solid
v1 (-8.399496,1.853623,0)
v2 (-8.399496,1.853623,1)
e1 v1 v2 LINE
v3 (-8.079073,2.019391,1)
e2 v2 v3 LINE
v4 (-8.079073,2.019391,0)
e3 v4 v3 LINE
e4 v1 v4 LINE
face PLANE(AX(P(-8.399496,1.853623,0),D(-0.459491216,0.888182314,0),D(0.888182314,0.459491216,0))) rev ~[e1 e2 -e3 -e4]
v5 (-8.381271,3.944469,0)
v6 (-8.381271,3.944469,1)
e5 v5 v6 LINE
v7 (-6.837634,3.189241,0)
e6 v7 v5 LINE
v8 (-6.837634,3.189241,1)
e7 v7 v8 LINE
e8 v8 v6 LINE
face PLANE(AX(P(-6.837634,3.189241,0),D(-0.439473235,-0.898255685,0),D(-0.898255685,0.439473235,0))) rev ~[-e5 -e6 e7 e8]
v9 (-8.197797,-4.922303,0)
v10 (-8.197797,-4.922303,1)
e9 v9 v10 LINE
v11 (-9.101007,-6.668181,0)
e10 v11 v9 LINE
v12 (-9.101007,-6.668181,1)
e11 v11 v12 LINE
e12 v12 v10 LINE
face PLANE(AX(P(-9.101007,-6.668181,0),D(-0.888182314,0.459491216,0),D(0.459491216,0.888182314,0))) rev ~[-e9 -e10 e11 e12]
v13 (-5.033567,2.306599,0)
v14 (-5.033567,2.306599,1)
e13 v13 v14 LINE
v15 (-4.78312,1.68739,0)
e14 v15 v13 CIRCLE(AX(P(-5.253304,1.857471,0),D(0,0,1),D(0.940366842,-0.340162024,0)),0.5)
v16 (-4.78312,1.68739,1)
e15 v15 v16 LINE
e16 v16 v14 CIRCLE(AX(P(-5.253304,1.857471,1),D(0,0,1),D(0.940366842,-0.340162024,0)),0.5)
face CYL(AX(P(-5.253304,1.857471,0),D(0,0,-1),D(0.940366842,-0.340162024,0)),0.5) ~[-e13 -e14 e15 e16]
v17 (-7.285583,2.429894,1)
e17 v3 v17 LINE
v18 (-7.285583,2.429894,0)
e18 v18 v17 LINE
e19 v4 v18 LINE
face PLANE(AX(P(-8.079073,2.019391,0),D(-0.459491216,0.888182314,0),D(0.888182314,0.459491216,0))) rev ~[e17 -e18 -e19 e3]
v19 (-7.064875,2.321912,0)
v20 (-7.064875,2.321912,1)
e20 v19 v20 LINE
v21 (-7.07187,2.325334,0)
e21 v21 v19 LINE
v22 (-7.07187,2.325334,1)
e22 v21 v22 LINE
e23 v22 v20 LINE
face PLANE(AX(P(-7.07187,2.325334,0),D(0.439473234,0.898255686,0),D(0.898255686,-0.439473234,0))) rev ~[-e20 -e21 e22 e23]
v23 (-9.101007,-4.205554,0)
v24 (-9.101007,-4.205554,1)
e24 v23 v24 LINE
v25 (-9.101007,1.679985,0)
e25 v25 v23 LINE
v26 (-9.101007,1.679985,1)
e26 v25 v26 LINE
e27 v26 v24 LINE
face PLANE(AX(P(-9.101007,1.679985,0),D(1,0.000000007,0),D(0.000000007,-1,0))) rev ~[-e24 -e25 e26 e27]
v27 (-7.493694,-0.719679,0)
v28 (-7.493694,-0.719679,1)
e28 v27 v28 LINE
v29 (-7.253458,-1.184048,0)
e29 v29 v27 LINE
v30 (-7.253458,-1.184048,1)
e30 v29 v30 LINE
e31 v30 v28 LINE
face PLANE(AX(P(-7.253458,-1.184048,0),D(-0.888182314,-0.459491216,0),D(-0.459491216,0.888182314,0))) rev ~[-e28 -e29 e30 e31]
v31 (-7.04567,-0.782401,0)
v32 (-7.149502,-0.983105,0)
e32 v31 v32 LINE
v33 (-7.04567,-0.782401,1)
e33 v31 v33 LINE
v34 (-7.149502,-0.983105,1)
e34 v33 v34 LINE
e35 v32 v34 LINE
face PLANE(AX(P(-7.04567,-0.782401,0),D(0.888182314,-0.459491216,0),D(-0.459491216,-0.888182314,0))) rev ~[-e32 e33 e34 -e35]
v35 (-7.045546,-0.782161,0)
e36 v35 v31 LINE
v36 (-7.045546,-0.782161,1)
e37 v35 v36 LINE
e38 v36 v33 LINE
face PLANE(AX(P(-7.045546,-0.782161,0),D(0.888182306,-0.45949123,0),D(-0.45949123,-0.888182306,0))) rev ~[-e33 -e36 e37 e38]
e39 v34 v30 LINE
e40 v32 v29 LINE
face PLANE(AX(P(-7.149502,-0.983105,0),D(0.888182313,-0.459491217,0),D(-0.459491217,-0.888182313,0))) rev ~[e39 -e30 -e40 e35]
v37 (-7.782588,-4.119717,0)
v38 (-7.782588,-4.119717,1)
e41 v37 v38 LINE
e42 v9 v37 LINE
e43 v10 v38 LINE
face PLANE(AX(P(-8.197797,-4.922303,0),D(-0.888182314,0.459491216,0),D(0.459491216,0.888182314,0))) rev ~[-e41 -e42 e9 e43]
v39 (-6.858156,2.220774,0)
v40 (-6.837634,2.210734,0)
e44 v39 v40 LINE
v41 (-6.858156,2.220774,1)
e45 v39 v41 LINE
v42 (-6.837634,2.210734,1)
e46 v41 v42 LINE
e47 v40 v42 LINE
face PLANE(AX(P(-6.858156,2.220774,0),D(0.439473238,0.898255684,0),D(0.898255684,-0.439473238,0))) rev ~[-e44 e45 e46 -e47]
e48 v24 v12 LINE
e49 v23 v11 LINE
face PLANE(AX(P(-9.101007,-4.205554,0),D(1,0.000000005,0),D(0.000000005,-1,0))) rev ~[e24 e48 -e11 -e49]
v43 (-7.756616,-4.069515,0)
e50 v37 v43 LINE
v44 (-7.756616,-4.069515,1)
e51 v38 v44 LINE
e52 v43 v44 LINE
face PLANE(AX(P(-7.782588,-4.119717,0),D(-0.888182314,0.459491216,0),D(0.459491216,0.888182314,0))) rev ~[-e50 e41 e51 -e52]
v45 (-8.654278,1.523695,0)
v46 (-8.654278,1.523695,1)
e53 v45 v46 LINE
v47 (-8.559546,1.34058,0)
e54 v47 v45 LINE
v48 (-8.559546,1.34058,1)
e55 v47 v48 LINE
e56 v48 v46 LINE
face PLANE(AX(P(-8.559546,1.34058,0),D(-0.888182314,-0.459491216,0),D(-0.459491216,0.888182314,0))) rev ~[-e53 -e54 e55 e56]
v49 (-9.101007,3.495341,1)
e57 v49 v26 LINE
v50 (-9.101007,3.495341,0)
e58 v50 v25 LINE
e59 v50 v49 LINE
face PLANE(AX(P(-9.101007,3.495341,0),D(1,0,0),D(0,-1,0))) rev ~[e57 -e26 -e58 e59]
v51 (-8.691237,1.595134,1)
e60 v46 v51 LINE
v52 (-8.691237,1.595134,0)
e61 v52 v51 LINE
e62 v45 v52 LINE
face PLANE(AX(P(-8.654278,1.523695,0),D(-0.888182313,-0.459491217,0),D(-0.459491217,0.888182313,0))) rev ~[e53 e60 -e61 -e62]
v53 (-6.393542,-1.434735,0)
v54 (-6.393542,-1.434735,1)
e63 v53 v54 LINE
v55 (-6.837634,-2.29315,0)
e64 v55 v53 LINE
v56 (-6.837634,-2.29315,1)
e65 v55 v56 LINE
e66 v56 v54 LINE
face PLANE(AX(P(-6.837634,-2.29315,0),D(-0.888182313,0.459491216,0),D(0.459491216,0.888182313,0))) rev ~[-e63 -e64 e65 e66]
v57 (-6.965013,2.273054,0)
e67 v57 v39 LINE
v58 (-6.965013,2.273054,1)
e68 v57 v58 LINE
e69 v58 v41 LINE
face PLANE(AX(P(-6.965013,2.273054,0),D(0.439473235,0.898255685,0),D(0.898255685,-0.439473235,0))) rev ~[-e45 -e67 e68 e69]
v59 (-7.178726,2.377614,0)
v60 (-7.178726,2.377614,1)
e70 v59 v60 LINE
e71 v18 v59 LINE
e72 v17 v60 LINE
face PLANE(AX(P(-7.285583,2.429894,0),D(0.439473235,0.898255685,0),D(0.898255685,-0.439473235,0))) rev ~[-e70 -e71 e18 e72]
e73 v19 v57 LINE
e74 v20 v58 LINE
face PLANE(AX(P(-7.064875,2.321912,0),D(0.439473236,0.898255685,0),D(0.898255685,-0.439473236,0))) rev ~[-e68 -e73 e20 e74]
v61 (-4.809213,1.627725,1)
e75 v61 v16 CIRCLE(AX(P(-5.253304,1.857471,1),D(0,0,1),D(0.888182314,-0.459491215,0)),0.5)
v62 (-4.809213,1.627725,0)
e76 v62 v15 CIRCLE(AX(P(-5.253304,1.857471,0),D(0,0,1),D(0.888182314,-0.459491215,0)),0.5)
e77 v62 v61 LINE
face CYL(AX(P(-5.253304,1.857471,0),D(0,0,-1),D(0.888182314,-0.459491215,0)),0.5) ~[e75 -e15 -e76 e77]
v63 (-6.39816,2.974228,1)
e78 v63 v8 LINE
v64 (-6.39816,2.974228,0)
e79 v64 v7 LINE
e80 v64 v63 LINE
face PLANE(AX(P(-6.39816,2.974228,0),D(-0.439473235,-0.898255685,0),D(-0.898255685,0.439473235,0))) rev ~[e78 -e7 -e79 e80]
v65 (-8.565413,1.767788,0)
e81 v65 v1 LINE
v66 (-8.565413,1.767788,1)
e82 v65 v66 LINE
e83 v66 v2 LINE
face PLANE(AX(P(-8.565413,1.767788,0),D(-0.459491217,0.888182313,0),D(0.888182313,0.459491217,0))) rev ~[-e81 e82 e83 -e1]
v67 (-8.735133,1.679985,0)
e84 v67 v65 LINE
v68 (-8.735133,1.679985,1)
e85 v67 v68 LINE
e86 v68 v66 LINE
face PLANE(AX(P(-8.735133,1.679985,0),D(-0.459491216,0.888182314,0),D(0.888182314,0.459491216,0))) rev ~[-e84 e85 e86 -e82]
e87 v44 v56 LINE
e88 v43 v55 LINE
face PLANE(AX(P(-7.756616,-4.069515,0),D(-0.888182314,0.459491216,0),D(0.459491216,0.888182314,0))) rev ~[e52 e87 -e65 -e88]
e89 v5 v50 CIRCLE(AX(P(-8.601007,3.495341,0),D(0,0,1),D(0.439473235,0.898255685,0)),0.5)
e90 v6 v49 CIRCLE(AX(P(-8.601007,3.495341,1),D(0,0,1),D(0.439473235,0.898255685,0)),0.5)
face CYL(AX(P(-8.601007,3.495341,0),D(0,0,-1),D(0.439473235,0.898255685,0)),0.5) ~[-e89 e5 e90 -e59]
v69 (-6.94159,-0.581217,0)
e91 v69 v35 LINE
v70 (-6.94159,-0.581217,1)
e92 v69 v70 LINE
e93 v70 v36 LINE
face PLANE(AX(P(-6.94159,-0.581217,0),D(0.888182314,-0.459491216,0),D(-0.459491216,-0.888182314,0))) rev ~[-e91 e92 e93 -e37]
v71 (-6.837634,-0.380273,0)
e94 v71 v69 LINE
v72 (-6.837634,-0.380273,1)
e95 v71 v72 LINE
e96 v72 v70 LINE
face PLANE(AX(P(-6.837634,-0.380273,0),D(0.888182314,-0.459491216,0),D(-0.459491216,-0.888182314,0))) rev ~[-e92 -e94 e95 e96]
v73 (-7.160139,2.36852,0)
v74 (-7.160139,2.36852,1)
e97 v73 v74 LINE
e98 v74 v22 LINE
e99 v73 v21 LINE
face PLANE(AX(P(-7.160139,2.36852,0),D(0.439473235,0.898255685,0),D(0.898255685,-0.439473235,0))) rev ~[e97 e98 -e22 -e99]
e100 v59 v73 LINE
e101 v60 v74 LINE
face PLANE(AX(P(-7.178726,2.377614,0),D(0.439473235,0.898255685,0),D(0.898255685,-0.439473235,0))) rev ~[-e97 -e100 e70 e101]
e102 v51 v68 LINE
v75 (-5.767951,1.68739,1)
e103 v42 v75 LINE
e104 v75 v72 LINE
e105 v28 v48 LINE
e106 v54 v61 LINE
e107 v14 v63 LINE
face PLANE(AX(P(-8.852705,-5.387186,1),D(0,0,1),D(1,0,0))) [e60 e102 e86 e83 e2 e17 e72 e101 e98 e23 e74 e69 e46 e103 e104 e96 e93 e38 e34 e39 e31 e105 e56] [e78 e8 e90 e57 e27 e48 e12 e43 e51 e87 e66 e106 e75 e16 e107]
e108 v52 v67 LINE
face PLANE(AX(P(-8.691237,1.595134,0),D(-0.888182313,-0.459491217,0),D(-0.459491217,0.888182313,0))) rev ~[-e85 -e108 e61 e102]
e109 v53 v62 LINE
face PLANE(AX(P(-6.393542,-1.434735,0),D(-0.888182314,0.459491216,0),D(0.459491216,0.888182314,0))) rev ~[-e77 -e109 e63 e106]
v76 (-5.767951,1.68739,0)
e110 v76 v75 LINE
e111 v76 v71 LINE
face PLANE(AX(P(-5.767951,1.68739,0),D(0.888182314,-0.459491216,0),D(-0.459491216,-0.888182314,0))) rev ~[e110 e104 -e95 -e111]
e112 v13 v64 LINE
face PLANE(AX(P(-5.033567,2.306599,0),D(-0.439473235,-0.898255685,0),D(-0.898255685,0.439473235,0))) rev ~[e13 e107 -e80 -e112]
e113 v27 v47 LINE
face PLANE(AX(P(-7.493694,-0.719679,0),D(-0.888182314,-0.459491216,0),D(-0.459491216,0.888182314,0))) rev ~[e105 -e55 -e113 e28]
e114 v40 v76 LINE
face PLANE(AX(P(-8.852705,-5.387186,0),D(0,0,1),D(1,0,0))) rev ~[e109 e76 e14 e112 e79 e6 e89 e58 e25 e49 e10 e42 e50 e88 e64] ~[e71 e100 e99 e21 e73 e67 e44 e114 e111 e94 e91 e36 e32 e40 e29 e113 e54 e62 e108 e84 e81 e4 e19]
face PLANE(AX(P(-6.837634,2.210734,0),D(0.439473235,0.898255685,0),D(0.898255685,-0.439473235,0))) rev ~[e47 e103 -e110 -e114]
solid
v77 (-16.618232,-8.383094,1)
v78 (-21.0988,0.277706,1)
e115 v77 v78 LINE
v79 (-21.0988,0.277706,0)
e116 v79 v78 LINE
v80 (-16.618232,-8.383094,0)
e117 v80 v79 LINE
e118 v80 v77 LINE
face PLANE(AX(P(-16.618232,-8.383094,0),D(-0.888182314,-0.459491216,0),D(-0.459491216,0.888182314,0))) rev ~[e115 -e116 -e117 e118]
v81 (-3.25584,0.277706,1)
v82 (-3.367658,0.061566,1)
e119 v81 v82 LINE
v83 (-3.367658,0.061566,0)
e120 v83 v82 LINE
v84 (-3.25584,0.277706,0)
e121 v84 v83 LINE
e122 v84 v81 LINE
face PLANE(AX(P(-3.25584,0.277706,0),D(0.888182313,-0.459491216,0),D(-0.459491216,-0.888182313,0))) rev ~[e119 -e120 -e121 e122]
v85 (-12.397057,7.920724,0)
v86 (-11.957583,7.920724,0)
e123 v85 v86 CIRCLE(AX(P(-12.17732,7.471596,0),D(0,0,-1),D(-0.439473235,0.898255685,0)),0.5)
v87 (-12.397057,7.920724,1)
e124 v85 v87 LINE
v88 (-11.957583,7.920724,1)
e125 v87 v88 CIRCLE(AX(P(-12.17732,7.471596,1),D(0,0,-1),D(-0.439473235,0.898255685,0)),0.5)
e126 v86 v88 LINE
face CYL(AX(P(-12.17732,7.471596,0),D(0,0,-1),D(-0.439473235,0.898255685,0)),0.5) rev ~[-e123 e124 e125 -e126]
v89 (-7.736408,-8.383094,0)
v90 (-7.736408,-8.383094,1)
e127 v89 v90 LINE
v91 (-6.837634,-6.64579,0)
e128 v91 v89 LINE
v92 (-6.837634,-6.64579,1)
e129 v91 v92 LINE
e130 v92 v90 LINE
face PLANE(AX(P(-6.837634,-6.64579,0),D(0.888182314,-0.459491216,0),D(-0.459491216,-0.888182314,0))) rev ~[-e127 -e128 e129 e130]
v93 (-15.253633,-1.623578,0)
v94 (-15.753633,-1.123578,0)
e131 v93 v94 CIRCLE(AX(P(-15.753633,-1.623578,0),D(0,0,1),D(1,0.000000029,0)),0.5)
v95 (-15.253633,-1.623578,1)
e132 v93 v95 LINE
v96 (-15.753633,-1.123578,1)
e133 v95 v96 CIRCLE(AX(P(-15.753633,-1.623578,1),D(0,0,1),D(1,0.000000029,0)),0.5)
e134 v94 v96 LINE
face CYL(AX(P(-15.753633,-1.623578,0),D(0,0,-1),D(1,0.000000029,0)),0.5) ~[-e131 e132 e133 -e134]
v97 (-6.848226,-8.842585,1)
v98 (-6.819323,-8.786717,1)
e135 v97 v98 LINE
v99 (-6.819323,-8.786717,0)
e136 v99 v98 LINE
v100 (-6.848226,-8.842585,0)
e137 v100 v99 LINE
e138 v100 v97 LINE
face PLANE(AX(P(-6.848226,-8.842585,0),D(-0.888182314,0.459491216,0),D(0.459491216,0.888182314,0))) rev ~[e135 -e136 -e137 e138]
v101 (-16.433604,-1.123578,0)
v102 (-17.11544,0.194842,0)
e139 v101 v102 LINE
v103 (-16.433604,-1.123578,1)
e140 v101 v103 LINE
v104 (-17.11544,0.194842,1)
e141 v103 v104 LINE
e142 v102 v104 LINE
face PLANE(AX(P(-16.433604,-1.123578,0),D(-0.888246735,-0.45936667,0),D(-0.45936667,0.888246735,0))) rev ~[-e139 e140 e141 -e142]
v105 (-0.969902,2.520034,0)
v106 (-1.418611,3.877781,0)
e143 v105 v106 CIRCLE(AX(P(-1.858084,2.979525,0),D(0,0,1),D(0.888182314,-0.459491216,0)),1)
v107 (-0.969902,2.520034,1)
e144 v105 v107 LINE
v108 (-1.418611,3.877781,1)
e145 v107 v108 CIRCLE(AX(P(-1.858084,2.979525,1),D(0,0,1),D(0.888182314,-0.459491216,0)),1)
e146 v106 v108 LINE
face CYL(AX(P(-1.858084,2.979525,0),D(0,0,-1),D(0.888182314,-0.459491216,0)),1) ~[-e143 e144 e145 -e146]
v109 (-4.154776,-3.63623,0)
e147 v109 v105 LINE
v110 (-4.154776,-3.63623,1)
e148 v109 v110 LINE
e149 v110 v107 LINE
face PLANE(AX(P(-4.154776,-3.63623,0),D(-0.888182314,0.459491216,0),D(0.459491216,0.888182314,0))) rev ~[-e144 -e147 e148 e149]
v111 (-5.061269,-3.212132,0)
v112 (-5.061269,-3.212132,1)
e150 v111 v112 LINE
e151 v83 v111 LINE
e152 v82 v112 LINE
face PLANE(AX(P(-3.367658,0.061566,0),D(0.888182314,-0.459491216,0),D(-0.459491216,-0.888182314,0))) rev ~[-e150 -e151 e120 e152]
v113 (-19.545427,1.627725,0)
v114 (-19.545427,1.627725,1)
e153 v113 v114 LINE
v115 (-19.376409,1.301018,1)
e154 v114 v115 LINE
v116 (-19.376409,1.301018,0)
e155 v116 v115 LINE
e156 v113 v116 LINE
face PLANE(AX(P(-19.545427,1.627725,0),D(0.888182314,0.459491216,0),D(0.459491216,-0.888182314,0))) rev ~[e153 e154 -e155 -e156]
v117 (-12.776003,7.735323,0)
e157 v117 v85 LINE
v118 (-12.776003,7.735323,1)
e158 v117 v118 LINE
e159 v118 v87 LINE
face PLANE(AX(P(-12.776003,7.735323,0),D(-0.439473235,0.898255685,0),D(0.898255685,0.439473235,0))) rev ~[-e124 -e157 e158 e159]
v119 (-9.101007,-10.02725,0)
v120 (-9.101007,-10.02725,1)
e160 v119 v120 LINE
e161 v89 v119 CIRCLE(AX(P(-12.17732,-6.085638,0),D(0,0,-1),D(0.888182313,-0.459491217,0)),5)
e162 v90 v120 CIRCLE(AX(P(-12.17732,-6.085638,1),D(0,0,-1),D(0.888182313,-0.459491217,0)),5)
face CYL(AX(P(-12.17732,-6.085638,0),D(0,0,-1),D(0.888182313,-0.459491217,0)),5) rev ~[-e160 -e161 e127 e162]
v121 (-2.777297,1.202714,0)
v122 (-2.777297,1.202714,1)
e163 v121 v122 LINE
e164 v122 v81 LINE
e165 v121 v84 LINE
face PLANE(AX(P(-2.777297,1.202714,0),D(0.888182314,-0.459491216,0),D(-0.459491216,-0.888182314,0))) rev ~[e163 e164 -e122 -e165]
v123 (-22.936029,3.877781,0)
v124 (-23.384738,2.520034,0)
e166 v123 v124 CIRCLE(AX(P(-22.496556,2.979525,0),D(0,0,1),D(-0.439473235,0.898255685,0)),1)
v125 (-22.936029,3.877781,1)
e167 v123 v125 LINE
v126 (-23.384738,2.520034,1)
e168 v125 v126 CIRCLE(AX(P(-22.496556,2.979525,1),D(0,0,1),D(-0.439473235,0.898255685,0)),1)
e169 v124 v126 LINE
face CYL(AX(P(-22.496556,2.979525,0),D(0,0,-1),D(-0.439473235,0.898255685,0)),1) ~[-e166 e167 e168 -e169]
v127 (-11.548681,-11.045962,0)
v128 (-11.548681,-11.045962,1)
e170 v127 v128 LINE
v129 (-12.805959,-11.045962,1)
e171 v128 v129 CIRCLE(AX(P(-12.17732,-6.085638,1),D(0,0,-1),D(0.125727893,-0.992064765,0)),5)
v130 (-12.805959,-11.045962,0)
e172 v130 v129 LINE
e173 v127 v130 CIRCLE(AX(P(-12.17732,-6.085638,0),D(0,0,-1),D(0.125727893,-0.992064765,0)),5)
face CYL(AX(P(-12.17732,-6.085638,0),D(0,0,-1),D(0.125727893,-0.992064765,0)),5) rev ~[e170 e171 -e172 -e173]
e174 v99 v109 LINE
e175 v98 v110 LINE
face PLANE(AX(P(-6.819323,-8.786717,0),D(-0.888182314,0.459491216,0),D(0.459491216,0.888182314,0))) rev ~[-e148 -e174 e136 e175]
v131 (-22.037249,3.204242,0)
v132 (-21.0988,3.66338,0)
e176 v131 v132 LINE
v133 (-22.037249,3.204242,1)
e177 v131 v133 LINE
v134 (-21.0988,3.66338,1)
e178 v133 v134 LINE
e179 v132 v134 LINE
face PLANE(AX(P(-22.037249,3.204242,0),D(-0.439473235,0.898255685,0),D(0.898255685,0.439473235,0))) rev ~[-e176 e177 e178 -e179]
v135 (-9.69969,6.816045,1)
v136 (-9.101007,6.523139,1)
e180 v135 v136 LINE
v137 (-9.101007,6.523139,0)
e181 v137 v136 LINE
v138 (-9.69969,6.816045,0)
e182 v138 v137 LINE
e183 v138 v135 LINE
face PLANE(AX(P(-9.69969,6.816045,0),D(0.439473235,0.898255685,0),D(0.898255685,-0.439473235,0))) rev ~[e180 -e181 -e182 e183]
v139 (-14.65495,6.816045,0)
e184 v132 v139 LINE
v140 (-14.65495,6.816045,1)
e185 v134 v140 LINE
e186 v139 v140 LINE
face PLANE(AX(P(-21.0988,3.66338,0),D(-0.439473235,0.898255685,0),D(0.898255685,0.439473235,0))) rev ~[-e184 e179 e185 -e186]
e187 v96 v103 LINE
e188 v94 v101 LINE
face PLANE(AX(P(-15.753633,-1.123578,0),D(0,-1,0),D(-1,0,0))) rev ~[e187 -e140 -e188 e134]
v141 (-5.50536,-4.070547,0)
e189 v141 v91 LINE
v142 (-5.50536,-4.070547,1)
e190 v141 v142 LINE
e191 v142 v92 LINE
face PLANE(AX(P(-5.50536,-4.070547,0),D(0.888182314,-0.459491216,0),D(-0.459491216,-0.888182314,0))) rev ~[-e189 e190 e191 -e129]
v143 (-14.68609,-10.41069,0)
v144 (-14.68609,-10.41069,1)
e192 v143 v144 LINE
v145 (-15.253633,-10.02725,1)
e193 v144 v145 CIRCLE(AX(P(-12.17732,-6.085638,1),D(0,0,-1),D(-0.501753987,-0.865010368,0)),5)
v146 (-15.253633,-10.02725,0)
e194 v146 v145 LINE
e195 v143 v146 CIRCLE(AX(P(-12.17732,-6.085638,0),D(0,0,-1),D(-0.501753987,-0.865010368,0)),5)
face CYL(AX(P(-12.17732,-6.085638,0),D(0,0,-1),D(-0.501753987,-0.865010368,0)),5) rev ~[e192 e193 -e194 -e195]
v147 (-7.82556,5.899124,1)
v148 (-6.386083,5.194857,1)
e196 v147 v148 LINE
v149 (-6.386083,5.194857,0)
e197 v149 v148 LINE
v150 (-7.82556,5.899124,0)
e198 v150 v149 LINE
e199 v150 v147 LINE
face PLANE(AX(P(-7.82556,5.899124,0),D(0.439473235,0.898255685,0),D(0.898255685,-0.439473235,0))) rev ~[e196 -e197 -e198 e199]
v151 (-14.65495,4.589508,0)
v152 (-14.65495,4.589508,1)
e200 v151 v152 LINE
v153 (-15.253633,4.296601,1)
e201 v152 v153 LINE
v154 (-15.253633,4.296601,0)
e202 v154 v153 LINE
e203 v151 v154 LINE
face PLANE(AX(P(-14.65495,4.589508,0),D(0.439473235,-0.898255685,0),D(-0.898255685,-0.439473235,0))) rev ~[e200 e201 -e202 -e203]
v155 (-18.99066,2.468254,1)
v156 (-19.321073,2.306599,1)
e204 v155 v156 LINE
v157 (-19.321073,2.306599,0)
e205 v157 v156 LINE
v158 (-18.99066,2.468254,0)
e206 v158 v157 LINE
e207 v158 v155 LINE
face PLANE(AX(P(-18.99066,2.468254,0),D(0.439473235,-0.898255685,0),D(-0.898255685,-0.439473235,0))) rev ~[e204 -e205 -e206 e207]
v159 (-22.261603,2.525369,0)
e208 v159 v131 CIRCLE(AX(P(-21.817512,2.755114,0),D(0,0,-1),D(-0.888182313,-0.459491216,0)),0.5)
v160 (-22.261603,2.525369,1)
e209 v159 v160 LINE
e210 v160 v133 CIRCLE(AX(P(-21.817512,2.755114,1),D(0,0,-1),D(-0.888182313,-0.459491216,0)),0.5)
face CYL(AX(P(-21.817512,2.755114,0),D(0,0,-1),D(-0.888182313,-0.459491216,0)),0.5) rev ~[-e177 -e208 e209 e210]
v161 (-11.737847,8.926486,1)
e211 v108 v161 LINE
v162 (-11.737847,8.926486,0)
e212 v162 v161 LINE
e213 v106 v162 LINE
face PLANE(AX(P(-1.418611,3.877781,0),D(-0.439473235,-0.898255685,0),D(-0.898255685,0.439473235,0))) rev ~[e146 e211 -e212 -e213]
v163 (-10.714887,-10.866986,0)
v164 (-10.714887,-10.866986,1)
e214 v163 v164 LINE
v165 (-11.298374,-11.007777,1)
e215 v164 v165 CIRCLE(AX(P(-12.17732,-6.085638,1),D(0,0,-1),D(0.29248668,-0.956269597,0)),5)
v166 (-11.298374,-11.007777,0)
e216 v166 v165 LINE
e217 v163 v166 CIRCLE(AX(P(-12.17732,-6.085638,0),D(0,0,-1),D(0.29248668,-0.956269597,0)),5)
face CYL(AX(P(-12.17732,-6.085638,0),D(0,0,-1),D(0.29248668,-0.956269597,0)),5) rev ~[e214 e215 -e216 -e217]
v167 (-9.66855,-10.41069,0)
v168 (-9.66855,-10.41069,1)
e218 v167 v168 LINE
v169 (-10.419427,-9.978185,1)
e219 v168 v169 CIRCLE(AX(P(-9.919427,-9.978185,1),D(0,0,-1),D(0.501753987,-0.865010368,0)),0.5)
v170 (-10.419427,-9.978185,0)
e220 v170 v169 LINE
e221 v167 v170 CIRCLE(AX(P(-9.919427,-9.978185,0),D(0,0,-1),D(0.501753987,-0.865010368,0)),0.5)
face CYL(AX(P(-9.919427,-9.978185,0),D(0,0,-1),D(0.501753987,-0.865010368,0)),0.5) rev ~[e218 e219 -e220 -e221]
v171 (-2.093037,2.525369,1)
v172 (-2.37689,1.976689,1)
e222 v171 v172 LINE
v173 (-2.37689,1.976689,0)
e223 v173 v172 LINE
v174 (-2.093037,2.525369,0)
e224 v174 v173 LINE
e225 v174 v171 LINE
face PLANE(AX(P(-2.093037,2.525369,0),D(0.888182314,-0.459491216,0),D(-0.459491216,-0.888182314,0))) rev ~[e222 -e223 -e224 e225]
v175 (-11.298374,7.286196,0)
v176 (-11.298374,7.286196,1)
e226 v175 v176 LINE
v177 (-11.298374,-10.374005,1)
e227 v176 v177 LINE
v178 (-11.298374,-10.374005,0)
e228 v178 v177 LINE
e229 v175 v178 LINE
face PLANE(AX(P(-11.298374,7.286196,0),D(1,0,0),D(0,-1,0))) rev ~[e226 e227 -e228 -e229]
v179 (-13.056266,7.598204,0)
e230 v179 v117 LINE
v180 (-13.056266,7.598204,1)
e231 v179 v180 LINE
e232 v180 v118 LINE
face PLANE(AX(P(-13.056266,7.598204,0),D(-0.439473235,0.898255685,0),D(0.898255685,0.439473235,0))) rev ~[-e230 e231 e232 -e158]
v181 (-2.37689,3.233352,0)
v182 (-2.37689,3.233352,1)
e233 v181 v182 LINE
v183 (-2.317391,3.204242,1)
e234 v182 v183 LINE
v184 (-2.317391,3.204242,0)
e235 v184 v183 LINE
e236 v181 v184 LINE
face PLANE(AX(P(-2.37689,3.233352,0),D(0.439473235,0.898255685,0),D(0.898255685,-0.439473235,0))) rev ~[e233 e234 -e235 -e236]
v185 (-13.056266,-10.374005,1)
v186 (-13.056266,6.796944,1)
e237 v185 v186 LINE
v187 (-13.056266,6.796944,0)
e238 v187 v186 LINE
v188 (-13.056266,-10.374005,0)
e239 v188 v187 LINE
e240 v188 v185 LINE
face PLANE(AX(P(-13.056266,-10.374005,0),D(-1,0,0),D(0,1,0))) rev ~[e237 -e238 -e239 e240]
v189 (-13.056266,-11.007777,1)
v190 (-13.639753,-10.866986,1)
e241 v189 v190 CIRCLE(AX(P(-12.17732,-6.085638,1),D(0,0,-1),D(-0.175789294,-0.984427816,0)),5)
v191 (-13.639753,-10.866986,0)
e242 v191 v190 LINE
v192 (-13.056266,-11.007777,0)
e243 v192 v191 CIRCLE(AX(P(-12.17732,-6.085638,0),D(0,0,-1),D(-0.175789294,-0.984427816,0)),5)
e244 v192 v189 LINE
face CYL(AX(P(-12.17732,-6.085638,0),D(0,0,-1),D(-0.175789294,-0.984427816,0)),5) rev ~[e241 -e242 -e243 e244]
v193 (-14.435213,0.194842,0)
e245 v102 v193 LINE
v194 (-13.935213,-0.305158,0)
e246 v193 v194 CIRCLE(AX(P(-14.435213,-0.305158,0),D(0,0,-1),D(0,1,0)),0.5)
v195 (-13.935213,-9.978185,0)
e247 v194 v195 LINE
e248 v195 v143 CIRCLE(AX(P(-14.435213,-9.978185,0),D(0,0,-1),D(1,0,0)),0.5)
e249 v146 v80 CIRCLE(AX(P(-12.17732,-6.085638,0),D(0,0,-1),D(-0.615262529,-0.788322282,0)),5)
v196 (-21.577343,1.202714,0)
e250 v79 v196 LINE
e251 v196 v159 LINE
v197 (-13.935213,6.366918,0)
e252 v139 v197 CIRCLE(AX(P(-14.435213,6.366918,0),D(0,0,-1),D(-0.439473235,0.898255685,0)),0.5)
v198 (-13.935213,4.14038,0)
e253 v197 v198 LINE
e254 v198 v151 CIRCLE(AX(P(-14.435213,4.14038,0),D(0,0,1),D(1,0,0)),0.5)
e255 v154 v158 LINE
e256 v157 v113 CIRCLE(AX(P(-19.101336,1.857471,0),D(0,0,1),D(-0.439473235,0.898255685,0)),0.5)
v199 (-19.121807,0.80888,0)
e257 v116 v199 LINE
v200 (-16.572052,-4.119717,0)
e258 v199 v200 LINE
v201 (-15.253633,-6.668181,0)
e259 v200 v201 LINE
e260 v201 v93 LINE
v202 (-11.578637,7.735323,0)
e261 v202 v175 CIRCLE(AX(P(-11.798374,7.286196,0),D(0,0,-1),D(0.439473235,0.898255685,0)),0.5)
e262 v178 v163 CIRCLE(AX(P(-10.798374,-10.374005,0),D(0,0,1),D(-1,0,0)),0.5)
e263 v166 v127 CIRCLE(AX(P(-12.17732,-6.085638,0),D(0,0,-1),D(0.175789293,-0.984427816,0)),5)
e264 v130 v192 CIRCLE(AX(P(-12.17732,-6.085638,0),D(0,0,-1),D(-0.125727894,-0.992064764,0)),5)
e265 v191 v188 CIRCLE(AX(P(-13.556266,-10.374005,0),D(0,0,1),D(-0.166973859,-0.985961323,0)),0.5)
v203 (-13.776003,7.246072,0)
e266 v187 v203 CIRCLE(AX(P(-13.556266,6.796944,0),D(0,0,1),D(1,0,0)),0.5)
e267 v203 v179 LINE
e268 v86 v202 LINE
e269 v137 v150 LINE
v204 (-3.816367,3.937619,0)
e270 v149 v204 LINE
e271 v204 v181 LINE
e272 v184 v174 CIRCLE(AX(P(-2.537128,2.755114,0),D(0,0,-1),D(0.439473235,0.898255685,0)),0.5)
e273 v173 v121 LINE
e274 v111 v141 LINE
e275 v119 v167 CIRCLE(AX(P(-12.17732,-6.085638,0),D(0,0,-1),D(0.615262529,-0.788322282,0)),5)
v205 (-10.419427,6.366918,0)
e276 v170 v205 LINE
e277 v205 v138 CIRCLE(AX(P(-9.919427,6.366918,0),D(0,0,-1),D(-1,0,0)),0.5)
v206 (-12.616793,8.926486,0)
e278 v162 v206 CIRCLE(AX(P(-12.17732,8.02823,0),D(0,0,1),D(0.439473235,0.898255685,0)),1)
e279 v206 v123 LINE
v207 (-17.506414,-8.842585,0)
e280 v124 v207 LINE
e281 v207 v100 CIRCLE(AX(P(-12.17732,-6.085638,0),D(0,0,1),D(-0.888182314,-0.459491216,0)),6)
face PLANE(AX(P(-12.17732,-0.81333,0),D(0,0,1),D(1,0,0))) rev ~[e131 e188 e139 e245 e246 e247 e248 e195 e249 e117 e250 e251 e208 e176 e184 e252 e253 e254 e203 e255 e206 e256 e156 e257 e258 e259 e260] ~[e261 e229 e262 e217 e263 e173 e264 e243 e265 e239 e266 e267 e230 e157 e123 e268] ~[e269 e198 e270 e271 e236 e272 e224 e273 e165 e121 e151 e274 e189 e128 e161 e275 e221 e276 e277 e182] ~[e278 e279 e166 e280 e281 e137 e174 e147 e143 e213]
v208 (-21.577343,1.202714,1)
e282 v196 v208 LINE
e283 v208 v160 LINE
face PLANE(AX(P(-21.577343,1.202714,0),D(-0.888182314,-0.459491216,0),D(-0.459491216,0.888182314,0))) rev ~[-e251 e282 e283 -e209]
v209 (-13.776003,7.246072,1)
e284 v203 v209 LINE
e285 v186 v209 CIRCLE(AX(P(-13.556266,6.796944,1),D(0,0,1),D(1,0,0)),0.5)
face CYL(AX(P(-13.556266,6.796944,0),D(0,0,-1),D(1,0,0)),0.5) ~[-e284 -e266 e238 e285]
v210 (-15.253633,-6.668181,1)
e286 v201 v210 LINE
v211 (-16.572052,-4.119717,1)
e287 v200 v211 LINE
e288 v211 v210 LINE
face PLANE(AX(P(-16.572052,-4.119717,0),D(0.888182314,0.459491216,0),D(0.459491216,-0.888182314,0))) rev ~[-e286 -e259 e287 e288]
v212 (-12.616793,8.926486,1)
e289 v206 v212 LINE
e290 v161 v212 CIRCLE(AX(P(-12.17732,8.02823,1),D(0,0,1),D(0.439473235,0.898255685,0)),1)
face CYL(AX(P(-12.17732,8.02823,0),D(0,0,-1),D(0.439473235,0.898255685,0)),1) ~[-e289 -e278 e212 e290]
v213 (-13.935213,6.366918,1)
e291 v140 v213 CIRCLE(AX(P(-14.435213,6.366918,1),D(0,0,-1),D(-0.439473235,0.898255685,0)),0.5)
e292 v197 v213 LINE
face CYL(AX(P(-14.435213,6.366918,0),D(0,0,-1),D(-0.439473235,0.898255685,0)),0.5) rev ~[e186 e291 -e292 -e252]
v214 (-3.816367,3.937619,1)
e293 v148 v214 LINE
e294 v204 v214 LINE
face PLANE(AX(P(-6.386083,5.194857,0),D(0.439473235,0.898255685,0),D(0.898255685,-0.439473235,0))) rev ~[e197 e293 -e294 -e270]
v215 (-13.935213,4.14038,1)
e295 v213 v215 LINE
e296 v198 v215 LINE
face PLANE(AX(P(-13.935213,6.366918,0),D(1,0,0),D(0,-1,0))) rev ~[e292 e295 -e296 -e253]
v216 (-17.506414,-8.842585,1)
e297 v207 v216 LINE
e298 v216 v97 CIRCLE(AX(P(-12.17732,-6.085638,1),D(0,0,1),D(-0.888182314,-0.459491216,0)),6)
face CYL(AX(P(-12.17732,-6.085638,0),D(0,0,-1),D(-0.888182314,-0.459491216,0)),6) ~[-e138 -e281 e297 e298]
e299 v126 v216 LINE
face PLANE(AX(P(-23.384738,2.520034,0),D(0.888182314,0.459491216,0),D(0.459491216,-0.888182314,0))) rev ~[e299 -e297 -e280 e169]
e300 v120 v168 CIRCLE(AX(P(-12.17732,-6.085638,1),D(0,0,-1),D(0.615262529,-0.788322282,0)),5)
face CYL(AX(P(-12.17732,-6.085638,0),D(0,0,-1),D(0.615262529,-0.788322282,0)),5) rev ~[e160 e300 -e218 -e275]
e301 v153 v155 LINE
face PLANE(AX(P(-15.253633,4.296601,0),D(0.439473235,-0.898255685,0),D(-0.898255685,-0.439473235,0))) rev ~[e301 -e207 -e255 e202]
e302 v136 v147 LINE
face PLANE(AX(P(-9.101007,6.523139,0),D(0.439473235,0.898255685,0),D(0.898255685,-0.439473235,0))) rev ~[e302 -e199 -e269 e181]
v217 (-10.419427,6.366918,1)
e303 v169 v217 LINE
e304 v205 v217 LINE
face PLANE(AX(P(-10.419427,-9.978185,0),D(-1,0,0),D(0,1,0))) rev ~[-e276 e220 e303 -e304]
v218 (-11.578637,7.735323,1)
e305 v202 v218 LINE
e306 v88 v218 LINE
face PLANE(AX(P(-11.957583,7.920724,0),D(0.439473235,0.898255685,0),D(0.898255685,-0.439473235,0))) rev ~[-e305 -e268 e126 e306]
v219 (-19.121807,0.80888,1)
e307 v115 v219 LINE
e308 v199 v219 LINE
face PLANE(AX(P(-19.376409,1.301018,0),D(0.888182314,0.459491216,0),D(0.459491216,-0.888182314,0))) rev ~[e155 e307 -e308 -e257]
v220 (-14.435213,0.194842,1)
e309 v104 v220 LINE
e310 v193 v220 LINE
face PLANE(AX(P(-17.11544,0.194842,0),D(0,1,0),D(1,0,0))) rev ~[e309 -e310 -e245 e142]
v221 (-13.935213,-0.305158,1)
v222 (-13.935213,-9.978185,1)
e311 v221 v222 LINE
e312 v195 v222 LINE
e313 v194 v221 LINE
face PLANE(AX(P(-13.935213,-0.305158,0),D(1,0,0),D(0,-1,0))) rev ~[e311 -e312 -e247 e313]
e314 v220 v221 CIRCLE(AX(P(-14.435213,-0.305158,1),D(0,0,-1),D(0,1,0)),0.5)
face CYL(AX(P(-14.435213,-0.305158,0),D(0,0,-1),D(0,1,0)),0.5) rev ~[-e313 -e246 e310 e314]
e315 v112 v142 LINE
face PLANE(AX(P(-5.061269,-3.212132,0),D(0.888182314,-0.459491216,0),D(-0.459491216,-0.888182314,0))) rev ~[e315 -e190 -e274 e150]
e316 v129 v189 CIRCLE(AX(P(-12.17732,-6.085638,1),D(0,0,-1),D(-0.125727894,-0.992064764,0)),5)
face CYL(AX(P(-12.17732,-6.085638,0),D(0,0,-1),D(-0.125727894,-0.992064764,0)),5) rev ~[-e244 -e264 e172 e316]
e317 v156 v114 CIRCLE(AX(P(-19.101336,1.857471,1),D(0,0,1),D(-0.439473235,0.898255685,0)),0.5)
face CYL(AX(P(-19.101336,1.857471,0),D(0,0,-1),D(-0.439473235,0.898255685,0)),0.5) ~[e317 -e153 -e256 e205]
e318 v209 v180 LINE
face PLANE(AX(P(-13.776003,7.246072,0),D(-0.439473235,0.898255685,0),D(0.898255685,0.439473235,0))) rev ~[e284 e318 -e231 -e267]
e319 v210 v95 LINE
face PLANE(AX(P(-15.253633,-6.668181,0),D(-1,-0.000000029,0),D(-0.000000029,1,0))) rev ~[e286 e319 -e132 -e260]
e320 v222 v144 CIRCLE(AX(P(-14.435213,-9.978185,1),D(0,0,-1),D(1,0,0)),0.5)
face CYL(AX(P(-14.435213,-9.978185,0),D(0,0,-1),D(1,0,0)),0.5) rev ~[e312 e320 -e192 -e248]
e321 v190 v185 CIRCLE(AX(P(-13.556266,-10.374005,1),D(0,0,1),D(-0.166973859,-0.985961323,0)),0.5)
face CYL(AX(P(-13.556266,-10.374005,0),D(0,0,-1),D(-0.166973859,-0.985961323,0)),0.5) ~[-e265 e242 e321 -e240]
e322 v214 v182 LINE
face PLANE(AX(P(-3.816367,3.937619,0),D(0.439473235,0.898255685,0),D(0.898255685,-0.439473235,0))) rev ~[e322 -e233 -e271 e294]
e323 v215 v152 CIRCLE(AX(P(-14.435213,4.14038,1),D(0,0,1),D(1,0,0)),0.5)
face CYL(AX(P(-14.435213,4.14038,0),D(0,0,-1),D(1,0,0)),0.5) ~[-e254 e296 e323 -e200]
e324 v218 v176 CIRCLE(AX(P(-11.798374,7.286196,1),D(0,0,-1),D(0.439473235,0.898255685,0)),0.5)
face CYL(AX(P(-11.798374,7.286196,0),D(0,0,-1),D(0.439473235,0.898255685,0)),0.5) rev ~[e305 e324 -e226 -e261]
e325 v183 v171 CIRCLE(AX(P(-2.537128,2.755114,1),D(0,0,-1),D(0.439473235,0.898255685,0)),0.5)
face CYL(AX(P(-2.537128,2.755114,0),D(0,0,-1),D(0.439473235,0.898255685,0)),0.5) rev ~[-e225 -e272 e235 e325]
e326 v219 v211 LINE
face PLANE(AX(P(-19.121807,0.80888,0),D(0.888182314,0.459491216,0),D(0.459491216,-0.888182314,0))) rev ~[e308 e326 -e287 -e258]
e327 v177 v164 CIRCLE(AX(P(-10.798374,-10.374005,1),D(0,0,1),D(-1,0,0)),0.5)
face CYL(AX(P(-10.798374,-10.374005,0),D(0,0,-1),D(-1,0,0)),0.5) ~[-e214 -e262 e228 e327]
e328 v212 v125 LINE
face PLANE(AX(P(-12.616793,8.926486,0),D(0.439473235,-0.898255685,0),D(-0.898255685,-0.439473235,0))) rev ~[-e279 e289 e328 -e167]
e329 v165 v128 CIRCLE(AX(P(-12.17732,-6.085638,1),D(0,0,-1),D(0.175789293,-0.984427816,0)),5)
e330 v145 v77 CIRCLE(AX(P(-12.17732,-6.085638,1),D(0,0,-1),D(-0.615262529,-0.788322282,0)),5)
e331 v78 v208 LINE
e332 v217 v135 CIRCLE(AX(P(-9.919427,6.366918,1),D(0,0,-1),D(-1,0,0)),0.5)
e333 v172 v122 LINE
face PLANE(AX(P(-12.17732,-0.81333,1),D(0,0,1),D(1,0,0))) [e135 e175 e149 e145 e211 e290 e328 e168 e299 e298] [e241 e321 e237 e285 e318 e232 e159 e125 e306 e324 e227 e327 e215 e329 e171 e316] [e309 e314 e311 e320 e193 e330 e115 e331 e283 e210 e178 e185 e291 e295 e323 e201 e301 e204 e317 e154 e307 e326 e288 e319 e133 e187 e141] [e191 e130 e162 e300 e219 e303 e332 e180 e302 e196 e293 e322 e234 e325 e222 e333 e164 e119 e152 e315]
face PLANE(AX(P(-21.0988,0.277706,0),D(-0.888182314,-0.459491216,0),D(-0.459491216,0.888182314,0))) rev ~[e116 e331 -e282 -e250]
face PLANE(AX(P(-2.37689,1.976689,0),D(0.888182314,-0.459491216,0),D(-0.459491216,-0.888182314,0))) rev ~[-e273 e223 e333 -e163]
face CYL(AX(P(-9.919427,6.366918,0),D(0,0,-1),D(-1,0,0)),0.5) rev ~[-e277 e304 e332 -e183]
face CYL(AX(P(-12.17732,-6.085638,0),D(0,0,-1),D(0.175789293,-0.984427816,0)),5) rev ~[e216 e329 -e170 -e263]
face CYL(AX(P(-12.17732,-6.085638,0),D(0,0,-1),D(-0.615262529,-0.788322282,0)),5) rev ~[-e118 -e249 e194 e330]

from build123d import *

# Parameters (mm, degrees)
F1_DEPTH = 1


# Not quite as in the source:
# - ends of sketch curves that miss each other by under 0.0002 mm in the source are joined
# - a feature names something its author has since deleted; it is built from what else it names


with BuildPart() as f1:
    # F0 (on Top) → F1 (new body)
    with BuildSketch(Plane.XY):
        with BuildLine():
            ThreePointArc((-11.7378467649, 8.9264858588), (-12.17732, 9.0282301738), (-12.6167932351, 8.9264858588))
            Line((-12.6167932351, 8.9264858588), (-22.9360292278, 3.8777807945))
            ThreePointArc((-22.9360292278, 3.8777807945), (-23.4460487393, 3.2933140895), (-23.3847383062, 2.5200338931))
            Line((-23.3847383062, 2.5200338931), (-17.5064138811, -8.8425854586))
            ThreePointArc((-17.5064138811, -8.8425854586), (-12.17732, -12.0856381601), (-6.8482261189, -8.8425854586))
            Line((-6.8482261189, -8.8425854586), (-6.8193229677, -8.786716561))
            Line((-6.8193229677, -8.786716561), (-4.1547760271, -3.6362297146))
            Line((-4.1547760271, -3.6362297146), (-0.9699016938, 2.5200338931))
            ThreePointArc((-0.9699016938, 2.5200338931), (-0.9085912607, 3.2933140895), (-1.4186107722, 3.8777807945))
            Line((-1.4186107722, 3.8777807945), (-11.7378467649, 8.9264858588))
        make_face()
        with BuildLine():
            ThreePointArc((-13.9352129405, -9.9781848161), (-14.1856518225, -10.4114506102), (-14.6860899339, -10.4106900001))
            ThreePointArc((-14.6860899339, -10.4106900001), (-14.9764347702, -10.2286994079), (-15.253632646, -10.0272495698))
            ThreePointArc((-15.253632646, -10.0272495698), (-16.0247836651, -9.2789159973), (-16.6182315676, -8.3830942422))
            Line((-16.6182315676, -8.3830942422), (-21.0987998739, 0.2777057515))
            Line((-21.0987998739, 0.2777057515), (-21.5773427489, 1.202714332))
            Line((-21.5773427489, 1.202714332), (-22.2616031934, 2.5253686134))
            ThreePointArc((-22.2616031934, 2.5253686134), (-22.29225841, 2.9120087116), (-22.0372486542, 3.2042420641))
            Line((-22.0372486542, 3.2042420641), (-21.0987998739, 3.6633798445))
            Line((-21.0987998739, 3.6633798445), (-14.6549495581, 6.8160453855))
            ThreePointArc((-14.6549495581, 6.8160453855), (-14.1705134022, 6.7911040048), (-13.9352129405, 6.366917543))
            Line((-13.9352129405, 6.366917543), (-13.9352129405, 4.1403800065))
            ThreePointArc((-13.9352129405, 4.1403800065), (-14.1705134022, 4.5645664683), (-14.6549495581, 4.589507849))
            Line((-14.6549495581, 4.589507849), (-15.253632646, 4.2966010544))
            Line((-15.253632646, 4.2966010544), (-18.9906600384, 2.4682535744))
            Line((-18.9906600384, 2.4682535744), (-18.5866887981, 1.687389658))
            Line((-18.5866887981, 1.687389658), (-16.9010777379, 2.5120779491))
            Line((-16.9010777379, 2.5120779491), (-14.6549495581, 3.6110002651))
            ThreePointArc((-14.6549495581, 3.6110002651), (-14.1705134022, 3.5860588844), (-13.9352129405, 3.1618724226))
            Line((-13.9352129405, 3.1618724226), (-13.9352129405, 1.0737917123))
            Line((-13.9352129405, 1.0737917123), (-13.9352129405, -0.3051582877))
            Line((-13.9352129405, -0.3051582877), (-13.9352129405, -9.9781848161))
        make_face(mode=Mode.SUBTRACT)
        with BuildLine():
            Line((-10.6659804544, -10.8341303593), (-10.4194270595, -10.7664300173))
            ThreePointArc((-10.4194270595, -10.7664300173), (-10.5663720437, -10.8190139832), (-10.7148866003, -10.8669861449))
            ThreePointArc((-10.7148866003, -10.8669861449), (-11.0045154737, -10.9461452883), (-11.2983735297, -11.0077772381))
            ThreePointArc((-11.2983735297, -11.0077772381), (-11.423285282, -11.0284543254), (-11.548680536, -11.0459619827))
            ThreePointArc((-11.548680536, -11.0459619827), (-11.6318465406, -11.0842260567), (-11.720595012, -11.1066856319))
            ThreePointArc((-11.720595012, -11.1066856319), (-12.17732, -11.1424265632), (-12.634044988, -11.1066856319))
            ThreePointArc((-12.634044988, -11.1066856319), (-12.7227934594, -11.0842260567), (-12.805959464, -11.0459619827))
            ThreePointArc((-12.805959464, -11.0459619827), (-12.931354718, -11.0284543254), (-13.0562664703, -11.0077772381))
            ThreePointArc((-13.0562664703, -11.0077772381), (-13.3501245263, -10.9461452883), (-13.6397533997, -10.8669861449))
            ThreePointArc((-13.6397533997, -10.8669861449), (-13.2335773511, -10.7559370641), (-13.0562664703, -10.3740054834))
            Line((-13.0562664703, -10.3740054834), (-13.0562664703, -10.0437429667))
            Line((-13.0562664703, -10.0437429667), (-13.0562664703, 5.3716664708))
            Line((-13.0562664703, 5.3716664708), (-13.0562664703, 6.7969437096))
            ThreePointArc((-13.0562664703, 6.7969437096), (-13.2915669319, 7.2211301714), (-13.7760030878, 7.246071552))
            Line((-13.7760030878, 7.246071552), (-13.0562664703, 7.5982040073))
            Line((-13.0562664703, 7.5982040073), (-12.7760030878, 7.7353233792))
            Line((-12.7760030878, 7.7353233792), (-12.3970566176, 7.9207236322))
            ThreePointArc((-12.3970566176, 7.9207236322), (-12.17732, 7.9715957897), (-11.9575833824, 7.9207236322))
            Line((-11.9575833824, 7.9207236322), (-11.5786369122, 7.7353233792))
            ThreePointArc((-11.5786369122, 7.7353233792), (-11.3741870679, 7.5508950751), (-11.2983735297, 7.2861955367))
            Line((-11.2983735297, 7.2861955367), (-11.2983735297, -10.0437429667))
            Line((-11.2983735297, -10.0437429667), (-11.2983735297, -10.3519767804))
            ThreePointArc((-11.2983735297, -10.3519767804), (-11.1015265128, -10.7495925105), (-10.6659804544, -10.8341303593))
        make_face(mode=Mode.SUBTRACT)
        with BuildLine():
            Line((-5.5053601225, -4.0705468447), (-6.0704119356, -5.1627745276))
            Line((-6.0704119356, -5.1627745276), (-6.8376335928, -6.6457902679))
            Line((-6.8376335928, -6.6457902679), (-7.7364084324, -8.3830942422))
            ThreePointArc((-7.7364084324, -8.3830942422), (-8.3298563349, -9.2789159973), (-9.101007354, -10.0272495698))
            ThreePointArc((-9.101007354, -10.0272495698), (-9.3782052298, -10.2286994079), (-9.6685500661, -10.4106900001))
            ThreePointArc((-9.6685500661, -10.4106900001), (-10.1689881775, -10.4114506102), (-10.4194270595, -9.9781848161))
            Line((-10.4194270595, -9.9781848161), (-10.4194270595, -1.8278266693))
            Line((-10.4194270595, -1.8278266693), (-10.4194270595, -0.3051582877))
            Line((-10.4194270595, -0.3051582877), (-10.4194270595, 0.2777057515))
            Line((-10.4194270595, 0.2777057515), (-10.4194270595, 0.5210568374))
            Line((-10.4194270595, 0.5210568374), (-10.4194270595, 3.0275448634))
            Line((-10.4194270595, 3.0275448634), (-10.4194270595, 4.6300693884))
            Line((-10.4194270595, 4.6300693884), (-10.4194270595, 6.366917543))
            Line((-10.4194270595, 6.366917543), (-10.4194270595, 7.1681778407))
            Line((-10.4194270595, 7.1681778407), (-9.6996904419, 6.8160453855))
            Line((-9.6996904419, 6.8160453855), (-9.101007354, 6.5231385909))
            Line((-9.101007354, 6.5231385909), (-7.825559943, 5.8991236145))
            Line((-7.825559943, 5.8991236145), (-6.386082692, 5.1948567393))
            Line((-6.386082692, 5.1948567393), (-3.816366891, 3.9376185884))
            Line((-3.816366891, 3.9376185884), (-2.3768901261, 3.2333519511))
            Line((-2.3768901261, 3.2333519511), (-2.3173913458, 3.2042420641))
            ThreePointArc((-2.3173913458, 3.2042420641), (-2.06238159, 2.9120087116), (-2.0930368066, 2.5253686134))
            Line((-2.0930368066, 2.5253686134), (-2.3768901261, 1.9766889238))
            Line((-2.3768901261, 1.9766889238), (-2.7772972511, 1.202714332))
            Line((-2.7772972511, 1.202714332), (-3.2558401261, 0.2777057515))
            Line((-3.2558401261, 0.2777057515), (-3.3676578126, 0.061565621))
            Line((-3.3676578126, 0.061565621), (-5.0612689658, -3.2121323703))
            Line((-5.0612689658, -3.2121323703), (-5.5053601225, -4.0705468447))
        make_face(mode=Mode.SUBTRACT)
        with BuildLine():
            Line((-16.5720523514, -4.1197169088), (-15.2536327446, -6.6681812422))
            Line((-15.2536327446, -6.6681812422), (-15.2536328928, -1.623578273))
            ThreePointArc((-15.2536328928, -1.623578273), (-15.4000795074, -1.2700248919), (-15.7536328928, -1.1235782877))
            Line((-15.7536328928, -1.1235782877), (-16.0720525039, -1.1235782877))
            Line((-16.0720525039, -1.1235782877), (-16.4336040792, -1.1235782877))
            Line((-16.4336040792, -1.1235782877), (-17.1154396337, 0.1948417123))
            Line((-17.1154396337, 0.1948417123), (-16.0720524345, 0.1948417123))
            Line((-16.0720524345, 0.1948417123), (-15.2536329075, 0.1948417123))
            Line((-15.2536329075, 0.1948417123), (-14.4352129405, 0.1948417123))
            ThreePointArc((-14.4352129405, 0.1948417123), (-14.08165955, 0.0483951029), (-13.9352129405, -0.3051582877))
            Line((-13.9352129405, -0.3051582877), (-13.9352129405, 1.0737917123))
            Line((-13.9352129405, 1.0737917123), (-15.2536329075, 1.0737917123))
            Line((-15.2536329075, 1.0737917123), (-18.2692507427, 1.0737917123))
            Line((-18.2692507427, 1.0737917123), (-18.6097401643, 1.0737917123))
            Line((-18.6097401643, 1.0737917123), (-19.1218068604, 0.8088797168))
            Line((-19.1218068604, 0.8088797168), (-16.5720523514, -4.1197169088))
        make_face()
        Polygon((-16.1325828631, -3.0563212317), (-16.6777508926, -2.0025282877), (-16.1325828631, -2.0025282877), (-16.1325828631, -2.6348403451), align=None, mode=Mode.SUBTRACT)
        with BuildLine():
            Line((-15.2536329075, 1.0737917123), (-13.9352129405, 1.0737917123))
            Line((-13.9352129405, 1.0737917123), (-13.9352129405, 3.1618724226))
            ThreePointArc((-13.9352129405, 3.1618724226), (-14.1705134022, 3.5860588844), (-14.6549495581, 3.6110002651))
            Line((-14.6549495581, 3.6110002651), (-16.9010777379, 2.5120779491))
            Line((-16.9010777379, 2.5120779491), (-18.5866887981, 1.687389658))
            Line((-18.5866887981, 1.687389658), (-18.3411390159, 1.2127495215))
            Line((-18.3411390159, 1.2127495215), (-18.2692507427, 1.0737917123))
            Line((-18.2692507427, 1.0737917123), (-15.2536329075, 1.0737917123))
        make_face()
        with BuildLine():
            Line((-19.5454273692, 1.6277250617), (-19.3764089282, 1.3010176414))
            Line((-19.3764089282, 1.3010176414), (-18.5866887981, 1.687389658))
            Line((-18.5866887981, 1.687389658), (-18.9906600384, 2.4682535744))
            Line((-18.9906600384, 2.4682535744), (-19.32107283, 2.3065985124))
            ThreePointArc((-19.32107283, 2.3065985124), (-19.5760825858, 2.01436516), (-19.5454273692, 1.6277250617))
        make_face()
        Polygon((-19.3764089282, 1.3010176414), (-19.1218068604, 0.8088797168), (-18.6097401643, 1.0737917123), (-18.3411390159, 1.2127495215), (-18.5866887981, 1.687389658), align=None)
        Polygon((-16.1325828631, -2.0025282877), (-16.6777508926, -2.0025282877), (-16.1325828631, -3.0563212317), (-16.1325828631, -2.6348403451), align=None)
        with BuildLine():
            Line((-10.4194270595, 7.1681778407), (-10.4194270595, 6.366917543))
            ThreePointArc((-10.4194270595, 6.366917543), (-10.1841265978, 6.7911040048), (-9.6996904419, 6.8160453855))
            Line((-9.6996904419, 6.8160453855), (-10.4194270595, 7.1681778407))
        make_face()
        with BuildLine():
            ThreePointArc((-11.720595012, -11.1066856319), (-11.6318465406, -11.0842260567), (-11.548680536, -11.0459619827))
            ThreePointArc((-11.548680536, -11.0459619827), (-12.17732, -11.0856381601), (-12.805959464, -11.0459619827))
            ThreePointArc((-12.805959464, -11.0459619827), (-12.7227934594, -11.0842260567), (-12.634044988, -11.1066856319))
            ThreePointArc((-12.634044988, -11.1066856319), (-12.17732, -11.1424265632), (-11.720595012, -11.1066856319))
        make_face()
        Polygon((-18.3411390159, 1.2127495215), (-18.6097401643, 1.0737917123), (-18.2692507427, 1.0737917123), align=None)
        with BuildLine():
            ThreePointArc((-10.7148866003, -10.8669861449), (-10.5663720437, -10.8190139832), (-10.4194270595, -10.7664300173))
            Line((-10.4194270595, -10.7664300173), (-10.6659804544, -10.8341303593))
            ThreePointArc((-10.6659804544, -10.8341303593), (-11.1015265128, -10.7495925105), (-11.2983735297, -10.3519767804))
            Line((-11.2983735297, -10.3519767804), (-11.2983735297, -10.3740054834))
            ThreePointArc((-11.2983735297, -10.3740054834), (-11.1210626489, -10.7559370641), (-10.7148866003, -10.8669861449))
        make_face()
    extrude(amount=F1_DEPTH)


with BuildPart() as f1b:
    # F0 (on Top) → F1, piece 2 (new body)
    with BuildSketch(Plane.XY):
        with BuildLine():
            Line((-9.1010072554, -6.6681812422), (-8.1977966169, -4.9223030059))
            ThreePointArc((-8.1977966169, -4.9223030059), (-8.6841611224, -4.6077302475), (-9.1010072685, -4.2055539889))
            Line((-9.1010072685, -4.2055539889), (-9.1010072554, -6.6681812422))
        make_face()
        with BuildLine():
            ThreePointArc((-9.1010072685, -4.2055539889), (-8.6841611224, -4.6077302475), (-8.1977966169, -4.9223030059))
            Line((-8.1977966169, -4.9223030059), (-7.7825876486, -4.1197169088))
            Line((-7.7825876486, -4.1197169088), (-7.7566160256, -4.0695145646))
            ThreePointArc((-7.7566160256, -4.0695145646), (-8.2518471552, -3.7073634999), (-8.6139982198, -3.2121323703))
            Line((-8.6139982198, -3.2121323703), (-9.101007354, -2.2707587726))
            Line((-9.101007354, -2.2707587726), (-9.101007354, -4.2055539889))
        make_face()
        with BuildLine():
            Line((-9.101007354, -1.623578273), (-9.101007354, -2.2707587726))
            Line((-9.101007354, -2.2707587726), (-8.6139982198, -3.2121323703))
            ThreePointArc((-8.6139982198, -3.2121323703), (-8.2518471552, -3.7073634999), (-7.7566160256, -4.0695145646))
            Line((-7.7566160256, -4.0695145646), (-6.8376335928, -2.2931499375))
            Line((-6.8376335928, -2.2931499375), (-6.393542436, -1.4347354631))
            ThreePointArc((-6.393542436, -1.4347354631), (-6.8376335928, -1.7049898549), (-7.2817247495, -1.4347354631))
            Line((-7.2817247495, -1.4347354631), (-8.8660545548, 1.6277250617))
            ThreePointArc((-8.8660545548, 1.6277250617), (-8.8784767188, 1.6535207057), (-8.8894020206, 1.6799850815))
            Line((-8.8894020206, 1.6799850815), (-9.101007354, 1.6799850815))
            Line((-9.101007354, 1.6799850815), (-9.101007354, -1.623578273))
        make_face()
        with BuildLine():
            Line((-9.101007354, 3.4953407566), (-9.101007354, 1.6799850815))
            Line((-9.101007354, 1.6799850815), (-8.8894020206, 1.6799850815))
            ThreePointArc((-8.8894020206, 1.6799850815), (-8.8869510867, 2.0412815765), (-8.6417000156, 2.3065985124))
            Line((-8.6417000156, 2.3065985124), (-7.2771068279, 2.9742282228))
            ThreePointArc((-7.2771068279, 2.9742282228), (-7.063182163, 3.0502044622), (-6.8376335928, 3.0759725378))
            Line((-6.8376335928, 3.0759725378), (-6.8376335928, 3.1892413061))
            Line((-6.8376335928, 3.1892413061), (-8.3812707365, 3.9444685991))
            ThreePointArc((-8.3812707365, 3.9444685991), (-8.8657068924, 3.9195272185), (-9.101007354, 3.4953407566))
        make_face()
        with BuildLine():
            ThreePointArc((-7.2817247495, -1.4347354631), (-6.8376335928, -1.7049898549), (-6.393542436, -1.4347354631))
            Line((-6.393542436, -1.4347354631), (-4.8092126308, 1.6277250617))
            ThreePointArc((-4.8092126308, 1.6277250617), (-4.7951941207, 1.6571321237), (-4.7831203666, 1.687389658))
            Line((-4.7831203666, 1.687389658), (-5.7679512019, 1.687389658))
            Line((-5.7679512019, 1.687389658), (-6.8376335928, -0.3802733283))
            Line((-6.8376335928, -0.3802733283), (-6.9415896155, -0.5812171058))
            Line((-6.9415896155, -0.5812171058), (-7.0455456382, -0.7821608834))
            Line((-7.0455456382, -0.7821608834), (-7.0456700866, -0.7824014383))
            Line((-7.0456700866, -0.7824014383), (-7.1495016609, -0.9831046609))
            Line((-7.1495016609, -0.9831046609), (-7.2534576837, -1.1840484384))
            Line((-7.2534576837, -1.1840484384), (-7.4936940826, -0.7196789075))
            Line((-7.4936940826, -0.7196789075), (-8.5595457985, 1.3405795023))
            Line((-8.5595457985, 1.3405795023), (-8.6542783092, 1.5236945164))
            Line((-8.6542783092, 1.5236945164), (-8.6912365674, 1.5951336867))
            Line((-8.6912365674, 1.5951336867), (-8.7351334904, 1.6799850815))
            Line((-8.7351334904, 1.6799850815), (-8.8894020206, 1.6799850815))
            ThreePointArc((-8.8894020206, 1.6799850815), (-8.8784767188, 1.6535207057), (-8.8660545548, 1.6277250617))
            Line((-8.8660545548, 1.6277250617), (-7.2817247495, -1.4347354631))
        make_face()
        with BuildLine():
            ThreePointArc((-8.6417000156, 2.3065985124), (-8.8869510867, 2.0412815765), (-8.8894020206, 1.6799850815))
            Line((-8.8894020206, 1.6799850815), (-8.7351334904, 1.6799850815))
            Line((-8.7351334904, 1.6799850815), (-8.5654128233, 1.7677881761))
            Line((-8.5654128233, 1.7677881761), (-8.3994958527, 1.8536234709))
            Line((-8.3994958527, 1.8536234709), (-8.0790730005, 2.0193906606))
            Line((-8.0790730005, 2.0193906606), (-7.285583076, 2.4298938254))
            Line((-7.285583076, 2.4298938254), (-7.1787263557, 2.3776139797))
            Line((-7.1787263557, 2.3776139797), (-6.8376335928, 2.5540745174))
            Line((-6.8376335928, 2.5540745174), (-6.8376335928, 3.0759725378))
            ThreePointArc((-6.8376335928, 3.0759725378), (-7.063182163, 3.0502044622), (-7.2771068279, 2.9742282228))
            Line((-7.2771068279, 2.9742282228), (-8.6417000156, 2.3065985124))
        make_face()
        with BuildLine():
            Line((-5.7679512019, 1.687389658), (-4.7831203666, 1.687389658))
            ThreePointArc((-4.7831203666, 1.687389658), (-4.7897821416, 2.0449478252), (-5.03356717, 2.3065985124))
            Line((-5.03356717, 2.3065985124), (-6.3981603577, 2.9742282228))
            ThreePointArc((-6.3981603577, 2.9742282228), (-6.6120850226, 3.0502044622), (-6.8376335928, 3.0759725378))
            Line((-6.8376335928, 3.0759725378), (-6.8376335928, 2.5540745174))
            Line((-6.8376335928, 2.5540745174), (-6.8376335928, 2.3389525605))
            Line((-6.8376335928, 2.3389525605), (-6.8376335928, 2.2107337222))
            Line((-6.8376335928, 2.2107337222), (-5.7679512019, 1.687389658))
        make_face()
        with BuildLine():
            Line((-6.3981603577, 2.9742282228), (-6.8376335928, 3.1892413061))
            Line((-6.8376335928, 3.1892413061), (-6.8376335928, 3.0759725378))
            ThreePointArc((-6.8376335928, 3.0759725378), (-6.6120850226, 3.0502044622), (-6.3981603577, 2.9742282228))
        make_face()
        Polygon((-6.8581561948, 2.2207744428), (-6.8376335928, 2.2107337222), (-6.8376335928, 2.3389525605), (-6.9650129151, 2.2730542884), align=None)
        Polygon((-6.8376335928, 2.3389525605), (-6.8376335928, 2.5540745174), (-7.1787263557, 2.3776139797), (-7.1601386162, 2.3685198942), (-7.0718696354, 2.3253341341), (-7.0648745265, 2.3219117643), (-6.9650129151, 2.2730542884), align=None)
    extrude(amount=F1_DEPTH)


solid = Compound([f1.part, f1b.part])
